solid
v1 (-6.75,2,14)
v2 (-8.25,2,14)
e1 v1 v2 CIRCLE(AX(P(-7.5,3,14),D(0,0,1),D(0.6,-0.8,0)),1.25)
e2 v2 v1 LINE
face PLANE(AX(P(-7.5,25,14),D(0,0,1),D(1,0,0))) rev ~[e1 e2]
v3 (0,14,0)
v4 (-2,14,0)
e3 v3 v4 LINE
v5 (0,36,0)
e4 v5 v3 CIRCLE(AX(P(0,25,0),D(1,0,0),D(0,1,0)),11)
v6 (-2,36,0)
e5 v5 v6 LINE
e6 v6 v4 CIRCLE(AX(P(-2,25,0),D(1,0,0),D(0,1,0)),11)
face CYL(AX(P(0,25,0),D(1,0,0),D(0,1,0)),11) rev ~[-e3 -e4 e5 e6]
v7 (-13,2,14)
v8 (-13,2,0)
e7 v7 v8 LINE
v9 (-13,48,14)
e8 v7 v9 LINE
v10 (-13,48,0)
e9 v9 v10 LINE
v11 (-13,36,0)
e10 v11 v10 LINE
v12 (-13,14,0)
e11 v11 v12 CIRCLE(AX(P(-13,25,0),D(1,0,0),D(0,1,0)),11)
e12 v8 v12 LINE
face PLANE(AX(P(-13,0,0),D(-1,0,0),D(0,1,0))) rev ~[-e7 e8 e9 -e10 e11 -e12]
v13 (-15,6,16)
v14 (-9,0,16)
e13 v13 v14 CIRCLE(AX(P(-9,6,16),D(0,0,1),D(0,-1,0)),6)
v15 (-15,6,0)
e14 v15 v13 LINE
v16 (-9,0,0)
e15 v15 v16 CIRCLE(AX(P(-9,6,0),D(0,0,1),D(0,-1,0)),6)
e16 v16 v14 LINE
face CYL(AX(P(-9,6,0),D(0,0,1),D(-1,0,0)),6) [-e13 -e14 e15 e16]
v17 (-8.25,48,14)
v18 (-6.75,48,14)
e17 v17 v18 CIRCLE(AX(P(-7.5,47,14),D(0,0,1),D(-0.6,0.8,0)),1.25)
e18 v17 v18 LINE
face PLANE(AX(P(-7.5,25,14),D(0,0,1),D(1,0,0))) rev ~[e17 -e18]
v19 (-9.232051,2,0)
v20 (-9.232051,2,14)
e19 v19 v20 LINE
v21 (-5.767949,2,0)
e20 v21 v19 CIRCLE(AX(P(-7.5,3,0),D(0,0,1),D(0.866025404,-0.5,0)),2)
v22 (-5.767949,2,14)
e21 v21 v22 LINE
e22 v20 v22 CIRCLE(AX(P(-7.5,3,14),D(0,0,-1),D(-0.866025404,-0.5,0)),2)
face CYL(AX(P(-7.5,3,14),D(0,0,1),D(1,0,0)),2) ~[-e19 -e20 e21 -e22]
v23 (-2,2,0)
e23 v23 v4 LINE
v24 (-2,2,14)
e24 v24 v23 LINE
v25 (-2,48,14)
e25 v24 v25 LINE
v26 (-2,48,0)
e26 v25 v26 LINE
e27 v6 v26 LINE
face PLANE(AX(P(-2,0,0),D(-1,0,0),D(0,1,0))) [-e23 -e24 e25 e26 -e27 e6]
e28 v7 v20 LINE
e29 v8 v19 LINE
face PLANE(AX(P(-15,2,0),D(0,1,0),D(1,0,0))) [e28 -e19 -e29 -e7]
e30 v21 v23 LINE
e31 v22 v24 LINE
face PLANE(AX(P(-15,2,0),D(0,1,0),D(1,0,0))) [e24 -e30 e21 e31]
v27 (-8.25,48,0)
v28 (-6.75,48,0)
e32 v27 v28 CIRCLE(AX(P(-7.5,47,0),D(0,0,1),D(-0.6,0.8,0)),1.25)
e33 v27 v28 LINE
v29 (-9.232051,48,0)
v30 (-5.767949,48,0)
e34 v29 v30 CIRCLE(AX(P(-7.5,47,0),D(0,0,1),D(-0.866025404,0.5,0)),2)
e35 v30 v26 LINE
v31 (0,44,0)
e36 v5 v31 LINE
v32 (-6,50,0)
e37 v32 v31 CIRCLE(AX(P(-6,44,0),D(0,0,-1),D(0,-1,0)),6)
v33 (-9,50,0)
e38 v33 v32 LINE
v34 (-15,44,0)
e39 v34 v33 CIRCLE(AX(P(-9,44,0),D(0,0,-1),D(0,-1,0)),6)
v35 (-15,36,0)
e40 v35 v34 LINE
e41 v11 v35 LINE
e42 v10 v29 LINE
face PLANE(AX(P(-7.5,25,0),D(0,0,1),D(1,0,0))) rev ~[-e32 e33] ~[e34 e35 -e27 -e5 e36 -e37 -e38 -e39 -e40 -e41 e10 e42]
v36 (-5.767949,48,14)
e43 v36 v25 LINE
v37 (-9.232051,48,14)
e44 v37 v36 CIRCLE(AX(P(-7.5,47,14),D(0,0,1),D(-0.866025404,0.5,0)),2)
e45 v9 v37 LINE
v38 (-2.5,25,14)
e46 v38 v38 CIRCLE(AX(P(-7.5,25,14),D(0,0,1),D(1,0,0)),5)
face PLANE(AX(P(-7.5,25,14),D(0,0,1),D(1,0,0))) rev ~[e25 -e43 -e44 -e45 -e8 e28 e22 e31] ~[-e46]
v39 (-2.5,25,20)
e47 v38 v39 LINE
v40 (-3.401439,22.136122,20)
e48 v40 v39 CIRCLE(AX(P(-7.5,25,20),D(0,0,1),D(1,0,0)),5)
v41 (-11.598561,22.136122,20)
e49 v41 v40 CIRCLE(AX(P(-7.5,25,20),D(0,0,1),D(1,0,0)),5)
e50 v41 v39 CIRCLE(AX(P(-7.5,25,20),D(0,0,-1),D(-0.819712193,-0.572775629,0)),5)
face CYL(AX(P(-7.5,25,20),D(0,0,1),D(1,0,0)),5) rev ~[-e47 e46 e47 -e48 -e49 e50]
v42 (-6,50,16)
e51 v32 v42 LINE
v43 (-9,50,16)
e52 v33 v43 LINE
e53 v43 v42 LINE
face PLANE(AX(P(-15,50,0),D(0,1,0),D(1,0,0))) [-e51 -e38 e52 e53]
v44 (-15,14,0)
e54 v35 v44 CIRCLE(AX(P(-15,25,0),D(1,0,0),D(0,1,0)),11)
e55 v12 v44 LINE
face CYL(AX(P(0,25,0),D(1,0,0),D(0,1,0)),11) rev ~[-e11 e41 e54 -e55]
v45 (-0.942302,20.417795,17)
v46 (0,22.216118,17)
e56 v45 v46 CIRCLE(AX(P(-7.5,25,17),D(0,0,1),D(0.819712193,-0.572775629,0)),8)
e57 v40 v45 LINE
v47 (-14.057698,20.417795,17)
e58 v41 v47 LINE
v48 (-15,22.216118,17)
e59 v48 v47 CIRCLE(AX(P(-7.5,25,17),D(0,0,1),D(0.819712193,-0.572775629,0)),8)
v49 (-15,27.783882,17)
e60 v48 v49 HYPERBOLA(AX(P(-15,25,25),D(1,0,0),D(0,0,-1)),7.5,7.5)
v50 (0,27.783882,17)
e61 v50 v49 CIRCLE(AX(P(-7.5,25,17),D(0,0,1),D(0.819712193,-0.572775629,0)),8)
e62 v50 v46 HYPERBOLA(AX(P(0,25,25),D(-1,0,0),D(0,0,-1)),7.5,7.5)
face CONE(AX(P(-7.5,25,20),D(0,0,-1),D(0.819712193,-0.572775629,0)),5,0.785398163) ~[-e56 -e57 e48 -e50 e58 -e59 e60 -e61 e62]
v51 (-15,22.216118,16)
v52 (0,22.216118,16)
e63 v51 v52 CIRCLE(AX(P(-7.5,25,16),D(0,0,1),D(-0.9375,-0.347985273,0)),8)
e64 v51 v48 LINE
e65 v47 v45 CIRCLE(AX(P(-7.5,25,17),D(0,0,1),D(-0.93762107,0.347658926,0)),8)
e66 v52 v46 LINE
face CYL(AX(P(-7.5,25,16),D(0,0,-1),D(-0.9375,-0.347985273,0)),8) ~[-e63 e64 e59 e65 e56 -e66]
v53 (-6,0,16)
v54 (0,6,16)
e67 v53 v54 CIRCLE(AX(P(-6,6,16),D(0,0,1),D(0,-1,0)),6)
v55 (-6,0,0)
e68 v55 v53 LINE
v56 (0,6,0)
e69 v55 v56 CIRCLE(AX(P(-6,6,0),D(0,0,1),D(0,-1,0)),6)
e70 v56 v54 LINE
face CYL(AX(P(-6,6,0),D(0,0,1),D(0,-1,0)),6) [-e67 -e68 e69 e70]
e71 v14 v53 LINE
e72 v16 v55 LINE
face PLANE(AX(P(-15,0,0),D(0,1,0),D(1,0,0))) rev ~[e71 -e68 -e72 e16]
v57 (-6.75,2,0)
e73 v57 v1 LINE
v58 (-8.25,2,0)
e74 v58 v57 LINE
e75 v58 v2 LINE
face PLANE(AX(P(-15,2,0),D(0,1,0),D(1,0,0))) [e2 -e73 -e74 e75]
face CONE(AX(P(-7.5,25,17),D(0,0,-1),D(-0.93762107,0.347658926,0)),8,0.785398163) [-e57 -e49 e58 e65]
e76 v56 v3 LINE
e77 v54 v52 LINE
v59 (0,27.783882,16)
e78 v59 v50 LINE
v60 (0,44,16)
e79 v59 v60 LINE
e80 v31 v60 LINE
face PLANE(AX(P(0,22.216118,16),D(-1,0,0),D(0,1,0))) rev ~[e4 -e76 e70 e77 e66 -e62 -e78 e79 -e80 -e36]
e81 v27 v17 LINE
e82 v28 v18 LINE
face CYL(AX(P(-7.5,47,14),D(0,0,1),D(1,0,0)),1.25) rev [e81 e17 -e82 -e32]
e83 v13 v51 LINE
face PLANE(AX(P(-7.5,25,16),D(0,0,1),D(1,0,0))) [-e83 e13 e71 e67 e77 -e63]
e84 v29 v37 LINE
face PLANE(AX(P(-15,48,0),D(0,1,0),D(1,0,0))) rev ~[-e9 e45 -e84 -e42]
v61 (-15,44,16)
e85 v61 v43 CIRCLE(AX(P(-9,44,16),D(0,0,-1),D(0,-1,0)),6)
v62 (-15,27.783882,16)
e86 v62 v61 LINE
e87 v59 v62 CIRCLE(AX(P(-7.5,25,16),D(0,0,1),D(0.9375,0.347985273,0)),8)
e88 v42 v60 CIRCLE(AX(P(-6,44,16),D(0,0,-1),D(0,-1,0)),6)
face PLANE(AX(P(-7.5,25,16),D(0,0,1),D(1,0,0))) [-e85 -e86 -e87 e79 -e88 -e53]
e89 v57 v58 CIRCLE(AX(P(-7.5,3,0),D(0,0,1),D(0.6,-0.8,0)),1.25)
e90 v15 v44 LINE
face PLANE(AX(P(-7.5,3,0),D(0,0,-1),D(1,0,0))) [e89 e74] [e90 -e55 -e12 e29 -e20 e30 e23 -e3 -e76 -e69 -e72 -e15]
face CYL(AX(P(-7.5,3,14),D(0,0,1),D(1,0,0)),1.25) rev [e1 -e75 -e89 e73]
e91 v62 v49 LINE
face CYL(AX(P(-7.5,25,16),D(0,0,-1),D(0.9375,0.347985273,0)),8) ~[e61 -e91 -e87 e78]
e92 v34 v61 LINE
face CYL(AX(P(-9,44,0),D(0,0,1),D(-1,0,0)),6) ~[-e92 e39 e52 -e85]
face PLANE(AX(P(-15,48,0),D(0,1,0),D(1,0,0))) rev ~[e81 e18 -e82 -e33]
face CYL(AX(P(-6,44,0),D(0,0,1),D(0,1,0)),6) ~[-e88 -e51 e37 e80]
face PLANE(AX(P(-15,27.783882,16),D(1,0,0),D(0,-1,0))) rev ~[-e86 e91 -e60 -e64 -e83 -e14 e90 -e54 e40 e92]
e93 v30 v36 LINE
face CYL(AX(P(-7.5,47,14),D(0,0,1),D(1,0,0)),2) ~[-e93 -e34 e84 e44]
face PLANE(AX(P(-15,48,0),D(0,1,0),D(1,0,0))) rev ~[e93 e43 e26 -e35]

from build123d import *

# Parameters (mm, degrees)
F0_W         = 15
F0_H         = 50
F1_DEPTH     = 16
F3_DEPTH     = 25
F4_T         = -2
F5_R         = 6
F6_R         = 5
F7_DEPTH     = 25
F9_DEPTH     = 4
F10_R        = 5
F11_DEPTH    = 25
F12_T2_ANGLE = 249.8880129875
F12_T4_ANGLE = 220.6883825687
F13_R        = 2
F13_R_2      = 1.25
F14_DEPTH    = 14


# Not quite as in the source:
# - a fillet or chamfer that OpenCascade refuses, or shapes differently, is made with other operations: its cross-section is extruded or revolved along the edge and cut away or added


with BuildPart() as f1:
    # F0 (on Top) → F1 (new body)
    with BuildSketch(Plane.XY):
        with Locations((-7.5, 25)):
            Rectangle(F0_W, F0_H)
    extrude(amount=F1_DEPTH)

    # F2 (on face) → F3 (cut)
    with BuildSketch(Plane.YZ):
        with BuildLine():
            Line((14, 0), (36, 0))
            ThreePointArc((36, 0), (25, 11), (14, 0))
        make_face()
    extrude(amount=-F3_DEPTH, mode=Mode.SUBTRACT)

    # F4
    f4_openings = [f1.faces().sort_by_distance(p)[0] for p in [
        (-7.5, 25, 11),
        (-7.5, 7, 0),
        (-7.5, 43, 0),
    ]]
    offset(amount=F4_T, openings=f4_openings)

    # F5
    f5_edges = [f1.edges().sort_by_distance(p)[0] for p in [
        (0, 0, 8),
        (0, 50, 8),
        (-15, 50, 8),
        (-15, 0, 8),
    ]]
    fillet(f5_edges, radius=F5_R)

    # F6 (on face) → F7 (cut)
    with BuildSketch(Plane.XY.offset(16)):
        with Locations((-7.5, 25)):
            Circle(F6_R)
    extrude(amount=-F7_DEPTH, mode=Mode.SUBTRACT)

    # F8 (on face) → F9 (join)
    with BuildSketch(Plane.XY.offset(16)):
        with BuildLine():
            ThreePointArc((0, 27.7838821814), (-7.5, 33), (-15, 27.7838821814))
            Line((-15, 27.7838821814), (-15, 22.2161178186))
            ThreePointArc((-15, 22.2161178186), (-7.5, 17), (0, 22.2161178186))
            Line((0, 22.2161178186), (0, 27.7838821814))
        make_face()
    extrude(amount=F9_DEPTH)

    # F10 (on face) → F11 (cut)
    with BuildSketch(Plane.XY.offset(20)):
        with Locations((-7.5, 25)):
            Circle(F10_R)
    extrude(amount=-F11_DEPTH, mode=Mode.SUBTRACT)

    # F12: chamfer of 3 on 4 edges, made by hand

    # F12_s1 → F12_t2 (revolve, cut)
    with BuildSketch(Plane(origin=(9.2772397602, 13.2768682197, 0), x_dir=(0, 0, 1), z_dir=(-0.572775629, -0.8197121927, 0))):
        Polygon((20, 15.4672321702), (17, 12.4672321702), (20, 12.4672321702), align=None)
    revolve(axis=Axis((-7.5, 25, 20), (0, 0, 1)), revolution_arc=F12_T2_ANGLE, mode=Mode.SUBTRACT)

    # F12_s3 → F12_t4 (revolve, cut)
    with BuildSketch(Plane(origin=(7.2428078971, 19.5335392611, 0), x_dir=(0, 0, 1), z_dir=(0.3476589265, 0.93762107, 0))):
        Polygon((17, -23.7236311869), (20, -20.7236311869), (20, -23.7236311869), align=None)
    revolve(axis=Axis((-7.5, 25, 20), (0, 0, 1)), revolution_arc=F12_T4_ANGLE, mode=Mode.SUBTRACT)

    # F13 (on face) → F14 (join)
    with BuildSketch(Plane(origin=(0, 0, 14), x_dir=(1, 0, 0), z_dir=(0, 0, -1))):
        with Locations((-7.5, -3)):
            Circle(F13_R)
        with Locations((-7.5, -3)):
            Circle(F13_R_2, mode=Mode.SUBTRACT)
        with Locations((-7.5, -47)):
            Circle(F13_R)
        with Locations((-7.5, -47)):
            Circle(F13_R_2, mode=Mode.SUBTRACT)
    extrude(amount=F14_DEPTH)


solid = f1.part
